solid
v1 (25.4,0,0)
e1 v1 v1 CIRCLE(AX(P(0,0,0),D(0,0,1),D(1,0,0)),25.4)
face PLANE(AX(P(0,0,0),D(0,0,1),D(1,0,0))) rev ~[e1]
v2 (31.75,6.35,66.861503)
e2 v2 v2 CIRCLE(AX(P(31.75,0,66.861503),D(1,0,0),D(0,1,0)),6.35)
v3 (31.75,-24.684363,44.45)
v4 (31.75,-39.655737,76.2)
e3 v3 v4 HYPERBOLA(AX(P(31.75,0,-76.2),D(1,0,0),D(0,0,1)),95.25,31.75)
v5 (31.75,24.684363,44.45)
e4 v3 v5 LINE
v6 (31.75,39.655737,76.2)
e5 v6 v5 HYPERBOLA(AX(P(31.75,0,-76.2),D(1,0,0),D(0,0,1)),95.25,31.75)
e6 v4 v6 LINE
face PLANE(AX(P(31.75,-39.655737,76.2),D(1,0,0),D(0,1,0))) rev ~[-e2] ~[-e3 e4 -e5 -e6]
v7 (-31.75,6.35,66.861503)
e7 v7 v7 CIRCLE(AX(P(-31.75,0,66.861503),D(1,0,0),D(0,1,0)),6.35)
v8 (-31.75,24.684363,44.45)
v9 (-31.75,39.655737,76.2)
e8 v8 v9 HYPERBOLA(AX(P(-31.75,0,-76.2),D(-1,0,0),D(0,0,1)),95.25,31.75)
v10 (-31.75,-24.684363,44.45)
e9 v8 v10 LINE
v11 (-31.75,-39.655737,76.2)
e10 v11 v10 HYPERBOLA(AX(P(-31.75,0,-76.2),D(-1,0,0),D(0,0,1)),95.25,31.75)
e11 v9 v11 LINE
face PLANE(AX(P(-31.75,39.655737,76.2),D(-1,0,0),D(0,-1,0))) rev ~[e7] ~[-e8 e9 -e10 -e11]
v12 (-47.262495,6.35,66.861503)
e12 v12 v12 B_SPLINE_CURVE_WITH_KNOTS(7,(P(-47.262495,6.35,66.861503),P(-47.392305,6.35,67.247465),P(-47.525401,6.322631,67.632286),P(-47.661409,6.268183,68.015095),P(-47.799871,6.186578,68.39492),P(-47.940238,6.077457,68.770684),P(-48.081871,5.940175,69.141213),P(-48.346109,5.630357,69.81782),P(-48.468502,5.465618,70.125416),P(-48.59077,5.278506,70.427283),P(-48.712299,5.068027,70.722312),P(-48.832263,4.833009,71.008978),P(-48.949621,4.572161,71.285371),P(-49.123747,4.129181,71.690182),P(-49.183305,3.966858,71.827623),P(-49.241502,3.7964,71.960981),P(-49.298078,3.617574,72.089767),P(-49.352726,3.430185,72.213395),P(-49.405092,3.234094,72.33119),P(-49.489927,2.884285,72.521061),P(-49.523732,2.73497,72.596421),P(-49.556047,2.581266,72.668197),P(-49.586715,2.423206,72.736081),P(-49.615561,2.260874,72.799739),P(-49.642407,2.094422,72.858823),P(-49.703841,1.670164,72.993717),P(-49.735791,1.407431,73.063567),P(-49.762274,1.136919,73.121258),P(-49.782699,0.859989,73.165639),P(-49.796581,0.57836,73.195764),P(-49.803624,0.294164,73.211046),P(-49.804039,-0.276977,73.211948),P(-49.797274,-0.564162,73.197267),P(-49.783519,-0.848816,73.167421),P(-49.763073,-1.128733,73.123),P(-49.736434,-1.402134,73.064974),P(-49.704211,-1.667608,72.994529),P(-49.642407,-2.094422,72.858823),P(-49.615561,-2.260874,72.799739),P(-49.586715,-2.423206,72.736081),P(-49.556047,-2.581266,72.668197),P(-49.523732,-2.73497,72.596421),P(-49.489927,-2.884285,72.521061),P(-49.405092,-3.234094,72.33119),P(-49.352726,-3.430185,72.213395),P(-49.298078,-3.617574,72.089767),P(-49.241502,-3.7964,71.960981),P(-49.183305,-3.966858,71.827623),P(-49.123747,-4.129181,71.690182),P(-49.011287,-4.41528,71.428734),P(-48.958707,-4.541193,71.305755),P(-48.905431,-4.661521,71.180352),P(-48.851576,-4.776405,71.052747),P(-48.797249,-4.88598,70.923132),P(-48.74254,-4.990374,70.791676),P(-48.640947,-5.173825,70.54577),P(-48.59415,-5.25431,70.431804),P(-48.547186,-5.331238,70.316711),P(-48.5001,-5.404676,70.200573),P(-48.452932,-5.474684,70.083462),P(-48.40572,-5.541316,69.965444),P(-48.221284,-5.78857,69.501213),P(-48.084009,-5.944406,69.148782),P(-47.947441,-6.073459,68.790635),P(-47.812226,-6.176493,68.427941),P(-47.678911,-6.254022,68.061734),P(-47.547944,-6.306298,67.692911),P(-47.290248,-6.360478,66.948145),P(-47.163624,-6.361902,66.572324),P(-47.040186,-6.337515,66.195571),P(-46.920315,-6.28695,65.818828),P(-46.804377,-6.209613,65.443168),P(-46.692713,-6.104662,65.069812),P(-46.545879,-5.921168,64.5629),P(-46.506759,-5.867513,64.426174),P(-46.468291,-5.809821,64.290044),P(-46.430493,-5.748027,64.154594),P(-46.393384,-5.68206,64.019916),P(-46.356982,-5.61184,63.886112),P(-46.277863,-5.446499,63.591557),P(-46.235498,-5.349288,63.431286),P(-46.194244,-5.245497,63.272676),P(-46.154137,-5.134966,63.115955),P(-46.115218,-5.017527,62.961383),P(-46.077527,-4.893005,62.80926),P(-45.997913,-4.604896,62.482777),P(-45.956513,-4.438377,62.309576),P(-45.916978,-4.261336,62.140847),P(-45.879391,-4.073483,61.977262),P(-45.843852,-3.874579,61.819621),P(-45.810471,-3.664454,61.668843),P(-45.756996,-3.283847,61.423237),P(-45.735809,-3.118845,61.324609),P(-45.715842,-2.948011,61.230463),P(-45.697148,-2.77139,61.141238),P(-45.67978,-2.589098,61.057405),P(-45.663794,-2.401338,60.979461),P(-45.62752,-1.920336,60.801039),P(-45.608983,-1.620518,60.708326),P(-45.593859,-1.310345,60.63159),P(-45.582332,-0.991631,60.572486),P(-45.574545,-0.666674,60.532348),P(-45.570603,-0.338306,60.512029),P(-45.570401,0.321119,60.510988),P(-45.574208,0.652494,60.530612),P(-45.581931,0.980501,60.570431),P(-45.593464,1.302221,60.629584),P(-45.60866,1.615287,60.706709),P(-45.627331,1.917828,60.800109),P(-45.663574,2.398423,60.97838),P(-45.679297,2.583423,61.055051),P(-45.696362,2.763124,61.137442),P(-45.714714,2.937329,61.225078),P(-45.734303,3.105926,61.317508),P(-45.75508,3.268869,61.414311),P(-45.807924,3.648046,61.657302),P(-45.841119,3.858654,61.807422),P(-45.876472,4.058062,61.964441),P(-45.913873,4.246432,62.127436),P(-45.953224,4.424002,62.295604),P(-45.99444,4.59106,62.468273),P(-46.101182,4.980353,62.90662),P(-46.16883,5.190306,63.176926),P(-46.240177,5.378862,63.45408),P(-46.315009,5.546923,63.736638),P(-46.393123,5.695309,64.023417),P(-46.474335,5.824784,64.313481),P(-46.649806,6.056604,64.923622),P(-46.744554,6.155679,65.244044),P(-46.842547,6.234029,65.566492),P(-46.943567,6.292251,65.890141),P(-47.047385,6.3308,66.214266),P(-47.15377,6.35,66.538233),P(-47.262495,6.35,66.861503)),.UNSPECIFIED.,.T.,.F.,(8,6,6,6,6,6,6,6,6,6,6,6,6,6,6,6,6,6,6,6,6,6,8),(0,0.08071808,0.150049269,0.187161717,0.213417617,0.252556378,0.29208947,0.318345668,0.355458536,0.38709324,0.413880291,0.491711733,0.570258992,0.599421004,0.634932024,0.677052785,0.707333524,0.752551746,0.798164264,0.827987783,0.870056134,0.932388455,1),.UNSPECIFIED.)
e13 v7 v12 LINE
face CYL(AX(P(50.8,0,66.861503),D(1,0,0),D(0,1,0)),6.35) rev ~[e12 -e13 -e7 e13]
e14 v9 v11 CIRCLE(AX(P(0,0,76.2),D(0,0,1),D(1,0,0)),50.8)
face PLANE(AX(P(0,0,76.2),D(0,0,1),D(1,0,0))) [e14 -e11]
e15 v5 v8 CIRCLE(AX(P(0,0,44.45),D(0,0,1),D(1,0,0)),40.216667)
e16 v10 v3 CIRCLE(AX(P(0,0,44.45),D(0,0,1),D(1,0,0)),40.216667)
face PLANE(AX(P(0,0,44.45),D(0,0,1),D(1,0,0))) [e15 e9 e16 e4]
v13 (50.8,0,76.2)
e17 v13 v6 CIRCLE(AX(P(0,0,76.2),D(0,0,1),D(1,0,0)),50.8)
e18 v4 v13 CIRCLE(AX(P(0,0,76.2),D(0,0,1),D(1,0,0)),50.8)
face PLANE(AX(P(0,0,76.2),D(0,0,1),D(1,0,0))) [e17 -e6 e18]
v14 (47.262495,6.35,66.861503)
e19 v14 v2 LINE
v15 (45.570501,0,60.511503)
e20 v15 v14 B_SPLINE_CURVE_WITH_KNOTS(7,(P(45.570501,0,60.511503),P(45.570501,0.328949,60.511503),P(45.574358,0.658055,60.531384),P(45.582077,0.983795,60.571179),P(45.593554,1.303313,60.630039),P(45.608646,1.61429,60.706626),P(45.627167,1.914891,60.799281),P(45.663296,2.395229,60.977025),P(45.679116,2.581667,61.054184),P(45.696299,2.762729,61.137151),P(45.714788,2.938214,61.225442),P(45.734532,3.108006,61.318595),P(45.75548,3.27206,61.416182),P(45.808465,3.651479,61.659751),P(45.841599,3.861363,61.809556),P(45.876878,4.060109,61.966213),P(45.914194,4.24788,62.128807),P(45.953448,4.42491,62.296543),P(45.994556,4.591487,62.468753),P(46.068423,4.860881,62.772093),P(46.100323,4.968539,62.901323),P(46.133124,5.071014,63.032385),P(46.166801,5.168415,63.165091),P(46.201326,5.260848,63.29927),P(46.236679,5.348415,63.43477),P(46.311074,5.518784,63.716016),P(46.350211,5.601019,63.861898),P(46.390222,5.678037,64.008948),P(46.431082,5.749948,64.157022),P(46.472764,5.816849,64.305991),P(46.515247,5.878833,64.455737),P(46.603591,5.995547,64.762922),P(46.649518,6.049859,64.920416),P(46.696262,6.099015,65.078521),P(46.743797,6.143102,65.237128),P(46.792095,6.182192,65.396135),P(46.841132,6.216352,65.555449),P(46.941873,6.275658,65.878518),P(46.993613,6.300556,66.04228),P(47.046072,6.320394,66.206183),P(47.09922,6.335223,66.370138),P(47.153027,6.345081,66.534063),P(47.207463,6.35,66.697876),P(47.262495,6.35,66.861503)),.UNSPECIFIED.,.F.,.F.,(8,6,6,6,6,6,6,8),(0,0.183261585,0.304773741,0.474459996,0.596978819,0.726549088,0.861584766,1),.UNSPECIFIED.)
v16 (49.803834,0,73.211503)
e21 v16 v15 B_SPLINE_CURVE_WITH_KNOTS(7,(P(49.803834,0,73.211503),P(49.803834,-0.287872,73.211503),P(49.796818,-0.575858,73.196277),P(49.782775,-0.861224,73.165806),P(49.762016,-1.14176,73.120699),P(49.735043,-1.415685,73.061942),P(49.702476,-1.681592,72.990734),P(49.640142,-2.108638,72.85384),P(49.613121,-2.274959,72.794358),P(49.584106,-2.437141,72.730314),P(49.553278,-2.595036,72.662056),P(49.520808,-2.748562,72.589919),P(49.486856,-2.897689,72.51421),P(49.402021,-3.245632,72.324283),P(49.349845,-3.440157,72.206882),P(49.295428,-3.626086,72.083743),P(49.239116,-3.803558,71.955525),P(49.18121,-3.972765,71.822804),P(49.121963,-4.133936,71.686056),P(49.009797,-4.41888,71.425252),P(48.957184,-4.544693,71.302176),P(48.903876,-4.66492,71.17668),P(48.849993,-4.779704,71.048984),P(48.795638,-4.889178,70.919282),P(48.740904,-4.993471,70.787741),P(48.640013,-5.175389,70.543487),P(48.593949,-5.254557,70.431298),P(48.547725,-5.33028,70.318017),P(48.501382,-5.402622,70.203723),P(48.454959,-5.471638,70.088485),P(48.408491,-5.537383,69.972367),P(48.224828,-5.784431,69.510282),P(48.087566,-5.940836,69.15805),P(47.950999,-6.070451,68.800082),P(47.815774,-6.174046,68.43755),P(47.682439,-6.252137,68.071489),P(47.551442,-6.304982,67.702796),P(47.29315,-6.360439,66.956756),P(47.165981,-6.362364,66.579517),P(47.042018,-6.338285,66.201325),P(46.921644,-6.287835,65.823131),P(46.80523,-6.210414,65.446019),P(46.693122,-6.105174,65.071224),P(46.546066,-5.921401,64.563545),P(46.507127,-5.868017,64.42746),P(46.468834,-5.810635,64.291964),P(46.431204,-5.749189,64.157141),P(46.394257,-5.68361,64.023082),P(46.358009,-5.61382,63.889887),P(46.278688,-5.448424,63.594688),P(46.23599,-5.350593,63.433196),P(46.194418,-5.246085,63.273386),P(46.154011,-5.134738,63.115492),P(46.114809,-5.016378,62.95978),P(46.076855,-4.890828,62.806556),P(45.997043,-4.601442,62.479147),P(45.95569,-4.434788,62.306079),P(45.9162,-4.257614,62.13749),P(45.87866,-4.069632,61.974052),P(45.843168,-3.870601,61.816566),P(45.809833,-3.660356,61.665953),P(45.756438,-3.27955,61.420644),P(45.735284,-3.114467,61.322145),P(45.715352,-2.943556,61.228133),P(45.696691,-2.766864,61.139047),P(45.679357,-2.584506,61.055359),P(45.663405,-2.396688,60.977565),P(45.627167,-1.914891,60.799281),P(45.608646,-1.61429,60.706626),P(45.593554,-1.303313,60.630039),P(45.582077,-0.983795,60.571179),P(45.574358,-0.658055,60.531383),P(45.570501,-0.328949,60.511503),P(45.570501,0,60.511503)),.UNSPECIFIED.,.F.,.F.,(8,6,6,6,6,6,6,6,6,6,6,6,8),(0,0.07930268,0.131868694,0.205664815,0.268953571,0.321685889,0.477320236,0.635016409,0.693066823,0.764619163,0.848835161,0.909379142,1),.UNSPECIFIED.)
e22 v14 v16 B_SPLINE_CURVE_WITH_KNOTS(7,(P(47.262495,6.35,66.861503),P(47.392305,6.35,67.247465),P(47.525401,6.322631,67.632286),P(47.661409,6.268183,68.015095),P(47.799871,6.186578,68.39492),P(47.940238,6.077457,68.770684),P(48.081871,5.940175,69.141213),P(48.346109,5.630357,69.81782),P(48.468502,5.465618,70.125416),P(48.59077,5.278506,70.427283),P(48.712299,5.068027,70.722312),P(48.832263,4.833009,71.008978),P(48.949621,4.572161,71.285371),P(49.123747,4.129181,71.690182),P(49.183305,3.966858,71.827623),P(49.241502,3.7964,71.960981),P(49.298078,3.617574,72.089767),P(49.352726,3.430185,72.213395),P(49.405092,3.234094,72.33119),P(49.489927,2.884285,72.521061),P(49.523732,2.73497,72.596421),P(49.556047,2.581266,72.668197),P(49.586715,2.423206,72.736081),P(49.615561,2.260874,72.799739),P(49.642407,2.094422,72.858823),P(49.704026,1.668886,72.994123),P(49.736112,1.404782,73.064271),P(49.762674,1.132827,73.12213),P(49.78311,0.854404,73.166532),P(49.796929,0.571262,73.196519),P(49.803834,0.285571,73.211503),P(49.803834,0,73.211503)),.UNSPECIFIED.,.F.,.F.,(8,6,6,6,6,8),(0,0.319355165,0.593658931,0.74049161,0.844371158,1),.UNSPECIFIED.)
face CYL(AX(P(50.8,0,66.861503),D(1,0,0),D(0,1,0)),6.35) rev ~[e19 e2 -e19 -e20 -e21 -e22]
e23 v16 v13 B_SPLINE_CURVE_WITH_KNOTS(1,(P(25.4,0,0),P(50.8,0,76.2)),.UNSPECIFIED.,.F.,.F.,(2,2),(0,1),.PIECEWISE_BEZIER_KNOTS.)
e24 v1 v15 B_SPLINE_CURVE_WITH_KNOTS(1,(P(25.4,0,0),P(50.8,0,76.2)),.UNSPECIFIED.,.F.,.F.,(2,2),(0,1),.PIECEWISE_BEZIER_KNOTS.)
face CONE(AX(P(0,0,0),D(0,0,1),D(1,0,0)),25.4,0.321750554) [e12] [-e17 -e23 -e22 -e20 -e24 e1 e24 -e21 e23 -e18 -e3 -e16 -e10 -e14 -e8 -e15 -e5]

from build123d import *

# Parameters (mm, degrees)
F0_R     = 25.4
F2_R     = 50.8
F5_DEPTH = 31.75
F7_R     = 6.35
F8_DEPTH = 127


# Not quite as in the source:
# - a feature names something its author has since deleted; it is built from what else it names


with BuildPart() as f3:
    # F0 (on Top) → F3 section 0
    with BuildSketch(Plane.XY):
        Circle(F0_R)
    # F2 (on offset) → F3 section 1
    with BuildSketch(Plane.XY.offset(76.2)):
        Circle(F2_R)
    loft()

    # F4 (on face) → F5 (cut)
    with BuildSketch(Plane.XY.offset(76.2)):
        with BuildLine():
            Line((31.75, -39.6557372898), (31.75, 39.6557372898))
            ThreePointArc((31.75, 39.6557372898), (0, 50.8), (-31.75, 39.6557372898))
            Line((-31.75, 39.6557372898), (-31.75, -39.6557372898))
            ThreePointArc((-31.75, -39.6557372898), (0, -50.8), (31.75, -39.6557372898))
        make_face()
    extrude(amount=-F5_DEPTH, mode=Mode.SUBTRACT)

    # F7 (on offset) → F8 (cut)
    with BuildSketch(Plane.YZ.offset(50.8)):
        with Locations((0, 66.8615028262)):
            Circle(F7_R)
    extrude(amount=-F8_DEPTH, mode=Mode.SUBTRACT)


solid = f3.part
